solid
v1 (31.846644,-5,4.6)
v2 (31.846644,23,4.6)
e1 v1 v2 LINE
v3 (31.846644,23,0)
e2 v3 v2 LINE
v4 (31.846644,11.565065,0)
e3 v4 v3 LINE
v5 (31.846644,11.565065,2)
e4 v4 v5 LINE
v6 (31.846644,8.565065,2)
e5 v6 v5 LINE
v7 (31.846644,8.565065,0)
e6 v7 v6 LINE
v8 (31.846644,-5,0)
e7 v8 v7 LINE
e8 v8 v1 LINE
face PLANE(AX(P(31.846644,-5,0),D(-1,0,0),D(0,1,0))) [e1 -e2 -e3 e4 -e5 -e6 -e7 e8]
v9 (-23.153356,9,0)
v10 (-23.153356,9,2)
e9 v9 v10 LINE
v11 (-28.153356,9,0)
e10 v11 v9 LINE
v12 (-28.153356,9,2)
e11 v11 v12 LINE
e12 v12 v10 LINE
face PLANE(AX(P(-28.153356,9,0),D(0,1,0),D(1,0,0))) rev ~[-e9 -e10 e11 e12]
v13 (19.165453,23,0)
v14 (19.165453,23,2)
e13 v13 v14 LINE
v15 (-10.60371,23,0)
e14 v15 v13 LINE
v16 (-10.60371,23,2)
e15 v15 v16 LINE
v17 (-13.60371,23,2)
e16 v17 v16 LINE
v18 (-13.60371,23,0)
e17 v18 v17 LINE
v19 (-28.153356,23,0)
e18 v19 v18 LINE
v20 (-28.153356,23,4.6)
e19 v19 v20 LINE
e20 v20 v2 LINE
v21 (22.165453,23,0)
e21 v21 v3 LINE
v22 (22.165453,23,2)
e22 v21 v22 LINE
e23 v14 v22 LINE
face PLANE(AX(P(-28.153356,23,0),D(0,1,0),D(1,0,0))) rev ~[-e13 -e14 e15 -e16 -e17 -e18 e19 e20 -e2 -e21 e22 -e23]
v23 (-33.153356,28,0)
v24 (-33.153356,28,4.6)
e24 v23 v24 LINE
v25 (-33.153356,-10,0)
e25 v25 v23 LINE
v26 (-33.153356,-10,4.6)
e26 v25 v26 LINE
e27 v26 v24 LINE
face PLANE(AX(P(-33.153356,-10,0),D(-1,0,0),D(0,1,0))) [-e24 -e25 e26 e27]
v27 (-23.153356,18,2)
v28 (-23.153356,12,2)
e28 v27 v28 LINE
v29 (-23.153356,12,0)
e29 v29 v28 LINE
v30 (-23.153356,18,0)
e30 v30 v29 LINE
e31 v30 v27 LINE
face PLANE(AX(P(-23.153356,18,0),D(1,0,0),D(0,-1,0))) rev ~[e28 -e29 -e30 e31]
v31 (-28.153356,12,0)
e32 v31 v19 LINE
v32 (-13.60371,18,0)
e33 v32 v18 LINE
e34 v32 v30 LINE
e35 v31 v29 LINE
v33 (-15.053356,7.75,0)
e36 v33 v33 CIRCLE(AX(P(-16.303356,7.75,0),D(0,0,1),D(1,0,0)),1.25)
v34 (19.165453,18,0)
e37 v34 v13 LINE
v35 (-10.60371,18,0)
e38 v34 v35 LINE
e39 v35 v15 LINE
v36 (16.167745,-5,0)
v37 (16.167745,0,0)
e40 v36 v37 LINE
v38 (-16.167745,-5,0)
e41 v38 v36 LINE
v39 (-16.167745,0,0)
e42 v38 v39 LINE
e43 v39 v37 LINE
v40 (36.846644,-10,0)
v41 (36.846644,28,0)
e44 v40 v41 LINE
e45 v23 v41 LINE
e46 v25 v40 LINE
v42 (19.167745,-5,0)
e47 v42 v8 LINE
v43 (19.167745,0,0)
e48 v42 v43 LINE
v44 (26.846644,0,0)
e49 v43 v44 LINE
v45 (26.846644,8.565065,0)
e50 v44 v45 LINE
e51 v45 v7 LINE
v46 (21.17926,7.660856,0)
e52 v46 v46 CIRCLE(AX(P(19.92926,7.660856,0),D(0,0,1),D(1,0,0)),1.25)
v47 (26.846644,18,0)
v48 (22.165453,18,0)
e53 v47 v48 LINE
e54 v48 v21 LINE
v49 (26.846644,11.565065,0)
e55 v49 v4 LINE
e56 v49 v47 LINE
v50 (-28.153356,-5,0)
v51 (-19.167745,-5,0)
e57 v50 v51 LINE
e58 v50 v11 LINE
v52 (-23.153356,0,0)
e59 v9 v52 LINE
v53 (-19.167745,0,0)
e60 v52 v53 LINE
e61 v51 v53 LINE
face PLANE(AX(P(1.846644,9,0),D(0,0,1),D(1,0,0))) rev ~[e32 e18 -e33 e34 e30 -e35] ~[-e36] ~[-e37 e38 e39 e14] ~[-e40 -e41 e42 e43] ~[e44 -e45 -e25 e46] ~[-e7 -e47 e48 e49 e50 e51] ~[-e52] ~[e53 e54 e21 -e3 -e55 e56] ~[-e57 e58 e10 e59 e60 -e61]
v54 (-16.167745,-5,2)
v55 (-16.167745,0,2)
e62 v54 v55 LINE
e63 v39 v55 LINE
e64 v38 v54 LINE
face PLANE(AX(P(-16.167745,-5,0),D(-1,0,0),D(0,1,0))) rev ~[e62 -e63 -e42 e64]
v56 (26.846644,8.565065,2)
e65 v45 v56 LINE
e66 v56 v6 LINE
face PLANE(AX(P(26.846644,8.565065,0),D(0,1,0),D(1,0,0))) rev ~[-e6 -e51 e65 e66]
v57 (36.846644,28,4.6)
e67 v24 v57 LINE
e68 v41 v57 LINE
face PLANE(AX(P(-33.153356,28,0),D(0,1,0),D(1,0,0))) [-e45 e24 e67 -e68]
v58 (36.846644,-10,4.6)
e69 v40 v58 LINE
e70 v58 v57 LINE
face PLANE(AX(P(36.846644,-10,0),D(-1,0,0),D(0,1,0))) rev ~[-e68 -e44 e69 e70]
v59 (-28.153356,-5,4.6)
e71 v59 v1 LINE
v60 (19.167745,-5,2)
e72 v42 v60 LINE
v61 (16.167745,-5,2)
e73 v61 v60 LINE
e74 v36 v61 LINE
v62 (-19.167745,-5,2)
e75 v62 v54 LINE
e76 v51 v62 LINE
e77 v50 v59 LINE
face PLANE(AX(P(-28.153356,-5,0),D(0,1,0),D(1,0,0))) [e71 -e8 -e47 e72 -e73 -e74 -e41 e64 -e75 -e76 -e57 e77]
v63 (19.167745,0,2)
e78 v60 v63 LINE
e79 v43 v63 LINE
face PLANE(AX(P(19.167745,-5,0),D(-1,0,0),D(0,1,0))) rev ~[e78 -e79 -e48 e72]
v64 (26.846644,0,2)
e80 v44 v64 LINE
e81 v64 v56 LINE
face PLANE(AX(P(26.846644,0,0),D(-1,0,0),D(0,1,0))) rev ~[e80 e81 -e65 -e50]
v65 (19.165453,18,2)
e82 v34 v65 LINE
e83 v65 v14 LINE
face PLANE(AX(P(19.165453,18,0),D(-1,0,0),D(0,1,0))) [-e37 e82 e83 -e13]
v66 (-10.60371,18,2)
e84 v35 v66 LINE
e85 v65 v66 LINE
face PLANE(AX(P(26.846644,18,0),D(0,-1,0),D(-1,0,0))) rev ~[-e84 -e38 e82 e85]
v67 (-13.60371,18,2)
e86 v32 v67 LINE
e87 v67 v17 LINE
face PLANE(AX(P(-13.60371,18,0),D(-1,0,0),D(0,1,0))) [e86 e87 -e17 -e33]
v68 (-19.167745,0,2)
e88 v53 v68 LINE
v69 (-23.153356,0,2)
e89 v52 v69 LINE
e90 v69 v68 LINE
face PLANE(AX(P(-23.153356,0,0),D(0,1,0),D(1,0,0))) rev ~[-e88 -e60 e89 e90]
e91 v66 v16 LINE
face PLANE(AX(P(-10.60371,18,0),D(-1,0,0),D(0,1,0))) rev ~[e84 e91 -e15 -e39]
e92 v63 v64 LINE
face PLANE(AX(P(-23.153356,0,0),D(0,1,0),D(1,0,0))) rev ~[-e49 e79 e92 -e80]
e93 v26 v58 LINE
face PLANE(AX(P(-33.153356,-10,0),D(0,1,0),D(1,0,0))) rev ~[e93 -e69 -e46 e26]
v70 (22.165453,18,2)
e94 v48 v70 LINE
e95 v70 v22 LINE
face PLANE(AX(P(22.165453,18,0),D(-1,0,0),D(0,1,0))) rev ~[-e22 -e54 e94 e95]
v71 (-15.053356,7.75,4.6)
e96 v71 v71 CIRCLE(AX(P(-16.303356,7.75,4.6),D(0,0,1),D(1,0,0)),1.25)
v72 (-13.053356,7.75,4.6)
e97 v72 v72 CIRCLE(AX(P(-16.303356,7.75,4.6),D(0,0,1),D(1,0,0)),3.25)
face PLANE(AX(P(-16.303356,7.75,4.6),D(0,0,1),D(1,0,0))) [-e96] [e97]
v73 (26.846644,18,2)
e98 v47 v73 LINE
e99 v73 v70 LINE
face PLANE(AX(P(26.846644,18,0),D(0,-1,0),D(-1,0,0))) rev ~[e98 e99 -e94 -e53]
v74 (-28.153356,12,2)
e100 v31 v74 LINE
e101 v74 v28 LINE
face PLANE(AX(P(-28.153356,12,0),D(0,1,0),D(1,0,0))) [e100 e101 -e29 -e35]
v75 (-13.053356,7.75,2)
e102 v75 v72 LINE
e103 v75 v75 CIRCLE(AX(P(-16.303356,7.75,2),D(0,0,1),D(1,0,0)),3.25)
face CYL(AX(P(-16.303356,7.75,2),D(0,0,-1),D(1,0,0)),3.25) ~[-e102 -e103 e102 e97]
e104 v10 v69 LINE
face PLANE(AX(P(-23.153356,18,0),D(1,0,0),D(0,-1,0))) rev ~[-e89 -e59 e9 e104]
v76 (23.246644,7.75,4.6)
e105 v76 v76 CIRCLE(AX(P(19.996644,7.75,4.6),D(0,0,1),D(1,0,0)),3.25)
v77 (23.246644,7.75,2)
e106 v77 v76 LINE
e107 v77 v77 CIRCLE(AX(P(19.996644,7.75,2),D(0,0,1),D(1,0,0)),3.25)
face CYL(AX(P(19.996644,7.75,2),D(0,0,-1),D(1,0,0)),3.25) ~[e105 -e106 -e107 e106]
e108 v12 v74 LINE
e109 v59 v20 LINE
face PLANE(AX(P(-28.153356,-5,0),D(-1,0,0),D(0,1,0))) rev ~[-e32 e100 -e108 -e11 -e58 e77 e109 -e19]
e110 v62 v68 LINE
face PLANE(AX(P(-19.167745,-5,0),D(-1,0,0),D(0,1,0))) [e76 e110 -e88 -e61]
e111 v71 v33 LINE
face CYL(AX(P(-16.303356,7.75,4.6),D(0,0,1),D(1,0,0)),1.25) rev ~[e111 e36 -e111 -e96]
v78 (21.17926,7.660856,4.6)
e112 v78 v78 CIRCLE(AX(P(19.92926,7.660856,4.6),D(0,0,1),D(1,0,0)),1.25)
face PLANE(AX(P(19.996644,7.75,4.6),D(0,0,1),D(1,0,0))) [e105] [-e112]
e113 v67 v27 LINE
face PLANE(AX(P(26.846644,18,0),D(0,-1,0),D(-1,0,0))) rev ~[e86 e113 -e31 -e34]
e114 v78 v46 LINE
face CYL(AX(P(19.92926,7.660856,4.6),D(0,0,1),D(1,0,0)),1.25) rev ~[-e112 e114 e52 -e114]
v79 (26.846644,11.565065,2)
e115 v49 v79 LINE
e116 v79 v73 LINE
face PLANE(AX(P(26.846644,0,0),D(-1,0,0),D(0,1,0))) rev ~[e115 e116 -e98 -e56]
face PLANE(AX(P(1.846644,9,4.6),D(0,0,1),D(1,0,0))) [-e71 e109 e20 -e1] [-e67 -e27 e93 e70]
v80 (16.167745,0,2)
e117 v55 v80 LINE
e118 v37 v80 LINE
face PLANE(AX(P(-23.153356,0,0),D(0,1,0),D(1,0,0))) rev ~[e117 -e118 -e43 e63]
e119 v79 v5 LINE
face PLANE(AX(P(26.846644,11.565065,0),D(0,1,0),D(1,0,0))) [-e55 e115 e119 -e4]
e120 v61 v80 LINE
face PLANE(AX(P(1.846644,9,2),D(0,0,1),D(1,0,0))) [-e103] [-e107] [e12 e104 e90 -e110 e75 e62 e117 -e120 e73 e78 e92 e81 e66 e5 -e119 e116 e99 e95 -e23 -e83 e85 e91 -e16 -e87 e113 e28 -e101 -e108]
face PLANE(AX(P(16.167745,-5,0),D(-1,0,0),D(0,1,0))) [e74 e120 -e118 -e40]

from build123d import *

# Parameters (mm, degrees)
F1_DEPTH  = 2
F2_R      = 3.25
F3_DEPTH  = 2.6
F0_W      = 3
F0_H      = 5
F5_DEPTH  = 2
F6_R      = 1.25
F7_DEPTH  = 25
F8_R      = 1.25
F9_DEPTH  = 25
F0_W_2    = 5
F0_H_2    = 3
F10_DEPTH = 2
F11_DEPTH = 2
F12_DEPTH = 2
F13_DEPTH = 2
F14_W     = 70
F14_H     = 38
F14_W_2   = 60
F14_H_2   = 28
F15_DEPTH = 4.6


# Not quite as in the source:
# - a feature names something its author has since deleted; it is built from what else it names


with BuildPart() as f1:
    # F0 (on Top) → F1 (new body)
    with BuildSketch(Plane.XY):
        Polygon((-13.6037096381, 18), (-23.153355509, 18), (-23.153355509, 12), (-23.153355509, 9), (-23.153355509, 0), (-19.1677454859, 0), (-16.1677454859, 0), (16.1677454859, 0), (19.1677454859, 0), (23.153355509, 0), (26.846644491, 0), (26.846644491, 8.565065451), (26.846644491, 11.565065451), (26.846644491, 18), (22.1654525697, 18), (19.1654525697, 18), (-10.6037096381, 18), align=None)
    extrude(amount=F1_DEPTH)

    # F2 (on face) → F3 (join)
    with BuildSketch(Plane.XY.offset(2)):
        with Locations((19.996644491, 7.75)):
            Circle(F2_R)
        with Locations((-16.303355509, 7.75)):
            Circle(F2_R)
    extrude(amount=F3_DEPTH)

    # F0 (on Top) → F5 (join)
    with BuildSketch(Plane.XY):
        with Locations((20.6654525697, 20.5)):
            Rectangle(F0_W, F0_H)
    extrude(amount=F5_DEPTH)

    # F6 (on face) → F7 (cut)
    with BuildSketch(Plane.XY.offset(4.6)):
        with Locations((-16.303355509, 7.75)):
            Circle(F6_R)
    extrude(amount=-F7_DEPTH, mode=Mode.SUBTRACT)

    # F8 (on face) → F9 (cut)
    with BuildSketch(Plane.XY.offset(4.6)):
        with Locations((19.9292600155, 7.6608564705)):
            Circle(F8_R)
    extrude(amount=-F9_DEPTH, mode=Mode.SUBTRACT)

    # F0 (on Top) → F10 (join)
    with BuildSketch(Plane.XY):
        with Locations((29.346644491, 10.065065451)):
            Rectangle(F0_W_2, F0_H_2)
        with Locations((-25.653355509, 10.5)):
            Rectangle(F0_W_2, F0_H_2)
    extrude(amount=F10_DEPTH)

    # F0 (on Top) → F11 (join)
    with BuildSketch(Plane.XY):
        with Locations((17.6677454859, -2.5)):
            Rectangle(F0_W, F0_H)
    extrude(amount=F11_DEPTH)

    # F0 (on Top) → F12 (join)
    with BuildSketch(Plane.XY):
        with Locations((-17.6677454859, -2.5)):
            Rectangle(F0_W, F0_H)
    extrude(amount=F12_DEPTH)

    # F0 (on Top) → F13 (join)
    with BuildSketch(Plane.XY):
        with Locations((-12.1037096381, 20.5)):
            Rectangle(F0_W, F0_H)
    extrude(amount=F13_DEPTH)

    # F14 (on Top) → F15 (join)
    with BuildSketch(Plane.XY):
        with Locations((1.846644491, 9)):
            Rectangle(F14_W, F14_H)
        with Locations((1.846644491, 9)):
            Rectangle(F14_W_2, F14_H_2, mode=Mode.SUBTRACT)
    extrude(amount=F15_DEPTH)


solid = f1.part
